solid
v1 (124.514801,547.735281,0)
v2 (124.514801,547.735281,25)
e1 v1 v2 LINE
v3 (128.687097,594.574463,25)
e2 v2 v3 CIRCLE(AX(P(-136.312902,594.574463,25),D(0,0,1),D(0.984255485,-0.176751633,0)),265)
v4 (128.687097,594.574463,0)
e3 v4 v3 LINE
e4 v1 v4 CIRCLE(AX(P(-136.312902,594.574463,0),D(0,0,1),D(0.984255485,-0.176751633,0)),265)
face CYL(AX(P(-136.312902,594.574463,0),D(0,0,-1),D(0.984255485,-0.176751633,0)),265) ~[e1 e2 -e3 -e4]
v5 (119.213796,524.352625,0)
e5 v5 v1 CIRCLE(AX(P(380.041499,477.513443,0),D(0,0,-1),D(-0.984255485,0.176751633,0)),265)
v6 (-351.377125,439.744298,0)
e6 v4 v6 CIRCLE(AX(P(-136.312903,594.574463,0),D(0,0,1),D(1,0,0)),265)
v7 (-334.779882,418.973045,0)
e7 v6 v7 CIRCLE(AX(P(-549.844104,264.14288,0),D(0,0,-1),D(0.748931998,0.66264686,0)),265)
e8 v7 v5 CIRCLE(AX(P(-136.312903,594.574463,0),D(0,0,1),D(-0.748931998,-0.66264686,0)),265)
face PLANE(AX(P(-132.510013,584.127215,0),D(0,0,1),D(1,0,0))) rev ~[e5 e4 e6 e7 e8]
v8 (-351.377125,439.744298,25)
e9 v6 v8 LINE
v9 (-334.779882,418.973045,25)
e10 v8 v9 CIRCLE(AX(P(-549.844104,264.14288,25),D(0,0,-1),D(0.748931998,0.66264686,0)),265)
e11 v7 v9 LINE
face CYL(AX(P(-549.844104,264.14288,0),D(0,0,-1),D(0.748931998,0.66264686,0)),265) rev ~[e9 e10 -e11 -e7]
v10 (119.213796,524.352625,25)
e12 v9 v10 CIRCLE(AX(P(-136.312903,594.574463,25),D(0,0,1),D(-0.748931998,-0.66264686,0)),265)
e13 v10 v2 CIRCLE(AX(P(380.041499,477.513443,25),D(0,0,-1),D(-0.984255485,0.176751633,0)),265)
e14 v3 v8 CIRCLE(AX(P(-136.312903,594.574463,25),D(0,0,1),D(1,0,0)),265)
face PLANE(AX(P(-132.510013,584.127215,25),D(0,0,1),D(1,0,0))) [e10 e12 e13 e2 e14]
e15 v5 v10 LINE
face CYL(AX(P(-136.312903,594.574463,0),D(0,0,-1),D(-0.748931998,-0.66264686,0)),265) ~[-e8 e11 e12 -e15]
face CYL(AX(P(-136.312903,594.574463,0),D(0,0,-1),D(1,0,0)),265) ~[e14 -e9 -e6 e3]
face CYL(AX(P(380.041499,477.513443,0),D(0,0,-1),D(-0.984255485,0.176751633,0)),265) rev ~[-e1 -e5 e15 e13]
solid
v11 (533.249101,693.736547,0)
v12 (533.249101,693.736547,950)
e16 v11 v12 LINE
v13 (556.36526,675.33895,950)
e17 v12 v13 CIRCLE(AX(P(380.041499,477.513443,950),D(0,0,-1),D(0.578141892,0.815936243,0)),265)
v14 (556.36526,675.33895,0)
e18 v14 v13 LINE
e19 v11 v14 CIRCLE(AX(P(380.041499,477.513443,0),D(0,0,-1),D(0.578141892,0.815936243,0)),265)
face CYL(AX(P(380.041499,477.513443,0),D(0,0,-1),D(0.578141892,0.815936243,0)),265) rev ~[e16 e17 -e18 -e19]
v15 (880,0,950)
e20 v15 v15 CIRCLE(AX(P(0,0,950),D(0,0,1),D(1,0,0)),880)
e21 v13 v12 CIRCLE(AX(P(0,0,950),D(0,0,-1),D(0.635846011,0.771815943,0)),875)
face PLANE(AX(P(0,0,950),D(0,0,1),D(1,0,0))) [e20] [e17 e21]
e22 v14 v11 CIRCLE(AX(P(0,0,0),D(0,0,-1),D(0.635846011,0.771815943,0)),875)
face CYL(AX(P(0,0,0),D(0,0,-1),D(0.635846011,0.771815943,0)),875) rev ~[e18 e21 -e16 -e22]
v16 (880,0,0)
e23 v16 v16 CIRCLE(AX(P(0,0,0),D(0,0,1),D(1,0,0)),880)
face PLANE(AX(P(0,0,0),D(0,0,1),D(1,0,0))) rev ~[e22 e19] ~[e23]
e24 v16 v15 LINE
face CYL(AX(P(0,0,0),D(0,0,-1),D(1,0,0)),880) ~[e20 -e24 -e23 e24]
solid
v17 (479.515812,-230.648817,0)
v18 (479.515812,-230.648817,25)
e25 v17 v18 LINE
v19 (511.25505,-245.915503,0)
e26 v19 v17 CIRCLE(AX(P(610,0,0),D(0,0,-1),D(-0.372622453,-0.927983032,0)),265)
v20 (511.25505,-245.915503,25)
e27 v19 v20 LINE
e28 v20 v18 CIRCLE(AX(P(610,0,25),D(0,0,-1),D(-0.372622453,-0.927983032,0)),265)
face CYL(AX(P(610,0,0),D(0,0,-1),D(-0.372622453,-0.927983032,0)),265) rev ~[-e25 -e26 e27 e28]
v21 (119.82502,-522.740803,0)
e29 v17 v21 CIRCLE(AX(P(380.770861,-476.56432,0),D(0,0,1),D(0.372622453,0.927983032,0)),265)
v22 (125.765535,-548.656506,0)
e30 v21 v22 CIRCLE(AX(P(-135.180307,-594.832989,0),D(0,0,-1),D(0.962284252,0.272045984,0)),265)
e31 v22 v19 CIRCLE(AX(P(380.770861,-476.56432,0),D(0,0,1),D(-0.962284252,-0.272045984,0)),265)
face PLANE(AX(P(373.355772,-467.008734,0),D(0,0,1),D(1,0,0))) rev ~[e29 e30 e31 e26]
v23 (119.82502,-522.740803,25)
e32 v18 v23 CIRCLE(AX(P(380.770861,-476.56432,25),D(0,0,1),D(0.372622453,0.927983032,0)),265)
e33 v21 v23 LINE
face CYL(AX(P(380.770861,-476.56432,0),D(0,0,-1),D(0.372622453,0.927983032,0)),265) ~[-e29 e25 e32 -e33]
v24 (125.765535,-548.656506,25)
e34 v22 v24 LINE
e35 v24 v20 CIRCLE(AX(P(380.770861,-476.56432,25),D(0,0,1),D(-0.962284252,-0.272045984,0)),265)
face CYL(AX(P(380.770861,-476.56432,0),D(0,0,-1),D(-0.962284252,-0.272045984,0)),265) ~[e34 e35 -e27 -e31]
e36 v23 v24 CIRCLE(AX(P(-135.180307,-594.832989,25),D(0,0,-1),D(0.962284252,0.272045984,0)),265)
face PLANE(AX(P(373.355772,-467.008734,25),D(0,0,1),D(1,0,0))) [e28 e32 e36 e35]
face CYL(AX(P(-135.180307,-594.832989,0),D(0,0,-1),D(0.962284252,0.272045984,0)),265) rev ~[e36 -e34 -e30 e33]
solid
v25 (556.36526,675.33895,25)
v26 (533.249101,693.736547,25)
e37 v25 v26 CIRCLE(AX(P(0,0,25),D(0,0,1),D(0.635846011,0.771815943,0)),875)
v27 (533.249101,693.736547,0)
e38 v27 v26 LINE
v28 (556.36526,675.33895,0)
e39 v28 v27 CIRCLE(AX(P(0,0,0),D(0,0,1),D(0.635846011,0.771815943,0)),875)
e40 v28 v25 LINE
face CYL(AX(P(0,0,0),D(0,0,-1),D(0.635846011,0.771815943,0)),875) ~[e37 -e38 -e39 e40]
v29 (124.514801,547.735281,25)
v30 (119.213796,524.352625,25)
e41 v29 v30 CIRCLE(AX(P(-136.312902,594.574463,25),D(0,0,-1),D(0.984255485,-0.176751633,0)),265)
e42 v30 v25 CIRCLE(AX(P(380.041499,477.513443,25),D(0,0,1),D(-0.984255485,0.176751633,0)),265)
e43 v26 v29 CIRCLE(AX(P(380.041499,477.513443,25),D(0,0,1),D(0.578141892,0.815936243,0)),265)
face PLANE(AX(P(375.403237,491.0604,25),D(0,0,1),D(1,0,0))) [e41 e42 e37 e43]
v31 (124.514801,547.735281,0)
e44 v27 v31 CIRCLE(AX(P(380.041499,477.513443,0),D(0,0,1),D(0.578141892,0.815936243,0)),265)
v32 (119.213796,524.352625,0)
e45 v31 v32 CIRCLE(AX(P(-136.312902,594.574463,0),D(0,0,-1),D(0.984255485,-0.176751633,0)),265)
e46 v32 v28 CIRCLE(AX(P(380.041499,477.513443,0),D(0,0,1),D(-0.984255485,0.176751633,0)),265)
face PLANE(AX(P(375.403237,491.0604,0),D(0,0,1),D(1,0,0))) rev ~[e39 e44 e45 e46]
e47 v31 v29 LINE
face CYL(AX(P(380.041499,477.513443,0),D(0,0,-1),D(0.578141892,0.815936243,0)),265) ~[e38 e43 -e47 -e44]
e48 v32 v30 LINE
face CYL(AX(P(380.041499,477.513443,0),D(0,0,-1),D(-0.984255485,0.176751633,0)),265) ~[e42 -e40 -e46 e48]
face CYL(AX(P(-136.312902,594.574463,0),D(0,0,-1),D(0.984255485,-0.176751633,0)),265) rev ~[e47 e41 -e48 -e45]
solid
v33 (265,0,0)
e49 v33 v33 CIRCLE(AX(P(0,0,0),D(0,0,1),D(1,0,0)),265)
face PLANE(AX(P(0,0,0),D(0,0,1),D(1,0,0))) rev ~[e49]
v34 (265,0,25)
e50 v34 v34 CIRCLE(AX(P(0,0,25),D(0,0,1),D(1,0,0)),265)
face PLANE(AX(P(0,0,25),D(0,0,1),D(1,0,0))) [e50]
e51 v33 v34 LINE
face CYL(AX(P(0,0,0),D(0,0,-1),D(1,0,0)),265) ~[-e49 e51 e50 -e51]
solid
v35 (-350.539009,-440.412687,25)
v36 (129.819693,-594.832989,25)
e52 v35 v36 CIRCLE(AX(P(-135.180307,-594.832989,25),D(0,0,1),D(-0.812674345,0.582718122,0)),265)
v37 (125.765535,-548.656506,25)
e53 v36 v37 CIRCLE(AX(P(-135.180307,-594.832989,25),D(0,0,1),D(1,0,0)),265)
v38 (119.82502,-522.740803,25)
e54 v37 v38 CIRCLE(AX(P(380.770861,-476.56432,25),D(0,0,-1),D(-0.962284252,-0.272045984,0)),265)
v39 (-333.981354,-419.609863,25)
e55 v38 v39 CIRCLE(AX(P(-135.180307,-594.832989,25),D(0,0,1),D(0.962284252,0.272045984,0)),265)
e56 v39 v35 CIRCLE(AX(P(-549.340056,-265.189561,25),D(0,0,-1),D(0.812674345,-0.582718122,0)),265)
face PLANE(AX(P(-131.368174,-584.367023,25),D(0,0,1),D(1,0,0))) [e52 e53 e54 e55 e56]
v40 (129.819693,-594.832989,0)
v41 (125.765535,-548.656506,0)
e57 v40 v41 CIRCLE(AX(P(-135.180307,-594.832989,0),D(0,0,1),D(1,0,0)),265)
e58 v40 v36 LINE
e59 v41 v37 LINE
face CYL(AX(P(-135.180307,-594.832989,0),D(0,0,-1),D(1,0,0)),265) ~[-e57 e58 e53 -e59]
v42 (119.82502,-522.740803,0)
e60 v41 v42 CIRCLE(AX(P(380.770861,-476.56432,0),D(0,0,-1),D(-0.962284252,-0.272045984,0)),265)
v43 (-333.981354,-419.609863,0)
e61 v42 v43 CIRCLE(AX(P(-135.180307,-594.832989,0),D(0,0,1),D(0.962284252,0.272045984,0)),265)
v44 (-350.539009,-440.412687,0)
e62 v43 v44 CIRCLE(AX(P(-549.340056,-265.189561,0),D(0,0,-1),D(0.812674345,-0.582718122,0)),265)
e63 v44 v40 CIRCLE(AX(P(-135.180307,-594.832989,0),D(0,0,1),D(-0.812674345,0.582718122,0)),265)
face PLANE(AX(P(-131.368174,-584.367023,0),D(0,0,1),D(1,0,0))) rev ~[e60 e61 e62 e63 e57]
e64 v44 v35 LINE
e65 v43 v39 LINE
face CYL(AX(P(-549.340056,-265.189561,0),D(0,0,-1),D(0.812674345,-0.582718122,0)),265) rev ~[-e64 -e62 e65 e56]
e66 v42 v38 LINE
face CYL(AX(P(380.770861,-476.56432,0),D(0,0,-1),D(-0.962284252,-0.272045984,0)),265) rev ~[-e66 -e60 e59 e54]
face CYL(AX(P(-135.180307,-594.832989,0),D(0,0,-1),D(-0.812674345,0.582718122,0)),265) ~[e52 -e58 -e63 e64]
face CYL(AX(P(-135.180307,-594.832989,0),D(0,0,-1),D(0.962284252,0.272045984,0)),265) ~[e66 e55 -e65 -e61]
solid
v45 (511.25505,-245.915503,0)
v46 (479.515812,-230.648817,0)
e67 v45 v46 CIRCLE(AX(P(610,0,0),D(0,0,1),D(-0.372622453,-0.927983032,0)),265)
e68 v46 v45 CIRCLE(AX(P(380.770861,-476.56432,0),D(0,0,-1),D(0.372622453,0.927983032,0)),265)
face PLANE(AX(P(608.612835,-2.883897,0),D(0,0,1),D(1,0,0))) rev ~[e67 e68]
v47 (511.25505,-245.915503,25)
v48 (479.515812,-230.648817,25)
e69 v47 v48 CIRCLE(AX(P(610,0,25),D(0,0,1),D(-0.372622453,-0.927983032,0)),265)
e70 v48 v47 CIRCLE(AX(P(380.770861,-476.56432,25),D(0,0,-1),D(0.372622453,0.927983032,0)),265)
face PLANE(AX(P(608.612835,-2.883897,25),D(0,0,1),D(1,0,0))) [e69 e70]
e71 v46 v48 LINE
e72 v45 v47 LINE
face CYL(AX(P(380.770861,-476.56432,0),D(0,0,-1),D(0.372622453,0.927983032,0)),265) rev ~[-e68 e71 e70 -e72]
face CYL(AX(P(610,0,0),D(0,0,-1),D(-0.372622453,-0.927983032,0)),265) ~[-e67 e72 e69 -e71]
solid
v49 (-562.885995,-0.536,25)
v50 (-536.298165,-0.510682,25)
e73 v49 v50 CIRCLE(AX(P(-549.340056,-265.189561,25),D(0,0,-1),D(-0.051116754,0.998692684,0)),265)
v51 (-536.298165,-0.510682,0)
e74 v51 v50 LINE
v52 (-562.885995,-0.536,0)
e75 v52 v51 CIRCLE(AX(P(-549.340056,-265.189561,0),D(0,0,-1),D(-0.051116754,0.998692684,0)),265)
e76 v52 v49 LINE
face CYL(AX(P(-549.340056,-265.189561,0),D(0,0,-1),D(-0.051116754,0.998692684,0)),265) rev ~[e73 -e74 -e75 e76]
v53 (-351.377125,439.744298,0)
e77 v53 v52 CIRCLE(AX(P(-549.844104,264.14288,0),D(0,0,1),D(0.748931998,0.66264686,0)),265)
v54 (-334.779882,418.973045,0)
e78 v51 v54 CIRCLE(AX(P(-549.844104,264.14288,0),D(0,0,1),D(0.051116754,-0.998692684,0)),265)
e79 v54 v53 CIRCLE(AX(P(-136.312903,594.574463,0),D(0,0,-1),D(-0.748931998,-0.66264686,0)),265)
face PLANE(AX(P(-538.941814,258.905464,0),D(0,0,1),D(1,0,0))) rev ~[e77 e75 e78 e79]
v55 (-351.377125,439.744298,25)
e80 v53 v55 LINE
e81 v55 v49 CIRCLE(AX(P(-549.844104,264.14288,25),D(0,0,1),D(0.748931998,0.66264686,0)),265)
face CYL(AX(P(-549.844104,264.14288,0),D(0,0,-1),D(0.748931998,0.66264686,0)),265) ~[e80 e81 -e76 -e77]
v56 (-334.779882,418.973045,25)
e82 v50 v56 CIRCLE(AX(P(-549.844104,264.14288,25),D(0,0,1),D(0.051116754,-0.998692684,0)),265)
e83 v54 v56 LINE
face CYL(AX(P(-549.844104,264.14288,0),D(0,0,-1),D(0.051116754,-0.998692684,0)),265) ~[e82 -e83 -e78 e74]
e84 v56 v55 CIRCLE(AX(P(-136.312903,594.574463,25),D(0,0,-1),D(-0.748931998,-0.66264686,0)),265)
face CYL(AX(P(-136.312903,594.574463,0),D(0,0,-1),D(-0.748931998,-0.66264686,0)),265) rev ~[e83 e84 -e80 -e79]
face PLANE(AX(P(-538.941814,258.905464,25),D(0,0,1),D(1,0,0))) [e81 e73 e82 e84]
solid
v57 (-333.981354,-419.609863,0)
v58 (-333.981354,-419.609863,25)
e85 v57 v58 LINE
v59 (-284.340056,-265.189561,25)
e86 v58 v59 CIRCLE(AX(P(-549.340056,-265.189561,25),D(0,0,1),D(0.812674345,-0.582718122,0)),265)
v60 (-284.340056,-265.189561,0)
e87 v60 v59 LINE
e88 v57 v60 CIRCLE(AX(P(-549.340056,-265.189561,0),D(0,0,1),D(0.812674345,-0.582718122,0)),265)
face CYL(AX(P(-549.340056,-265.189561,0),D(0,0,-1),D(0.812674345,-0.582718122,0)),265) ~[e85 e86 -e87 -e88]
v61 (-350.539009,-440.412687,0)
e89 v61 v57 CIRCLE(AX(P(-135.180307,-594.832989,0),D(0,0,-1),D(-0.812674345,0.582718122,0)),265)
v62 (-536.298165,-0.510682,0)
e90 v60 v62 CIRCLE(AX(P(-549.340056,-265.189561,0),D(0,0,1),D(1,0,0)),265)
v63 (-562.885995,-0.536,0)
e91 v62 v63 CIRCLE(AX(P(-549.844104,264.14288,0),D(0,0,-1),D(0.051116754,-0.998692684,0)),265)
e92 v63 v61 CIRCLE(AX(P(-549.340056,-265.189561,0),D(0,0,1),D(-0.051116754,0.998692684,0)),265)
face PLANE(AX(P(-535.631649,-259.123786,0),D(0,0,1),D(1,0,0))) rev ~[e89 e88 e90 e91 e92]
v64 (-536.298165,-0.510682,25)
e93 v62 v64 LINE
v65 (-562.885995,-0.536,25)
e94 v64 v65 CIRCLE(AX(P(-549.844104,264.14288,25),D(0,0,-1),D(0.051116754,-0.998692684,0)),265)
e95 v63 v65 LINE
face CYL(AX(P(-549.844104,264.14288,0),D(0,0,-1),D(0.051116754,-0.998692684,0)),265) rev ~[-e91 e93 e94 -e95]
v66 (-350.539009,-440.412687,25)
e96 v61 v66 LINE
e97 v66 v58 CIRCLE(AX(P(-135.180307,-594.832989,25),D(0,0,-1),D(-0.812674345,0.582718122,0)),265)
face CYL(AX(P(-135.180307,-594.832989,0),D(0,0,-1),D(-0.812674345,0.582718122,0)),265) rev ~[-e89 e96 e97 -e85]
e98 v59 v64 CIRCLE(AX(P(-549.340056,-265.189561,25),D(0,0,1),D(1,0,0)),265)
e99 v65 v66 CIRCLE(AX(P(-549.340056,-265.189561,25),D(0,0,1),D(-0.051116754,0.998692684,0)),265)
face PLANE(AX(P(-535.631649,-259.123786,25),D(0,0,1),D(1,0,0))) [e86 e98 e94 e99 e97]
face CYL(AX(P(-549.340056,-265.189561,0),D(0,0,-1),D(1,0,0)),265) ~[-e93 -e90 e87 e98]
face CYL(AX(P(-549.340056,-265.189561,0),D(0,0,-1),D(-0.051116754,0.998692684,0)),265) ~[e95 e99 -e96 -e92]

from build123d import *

# Parameters (mm, degrees)
F1_DEPTH = 25
F0_R     = 265
F0_R_2   = 880
F2_DEPTH = 950


with BuildPart() as f1:
    # F0 (on Top) → F1 (new body)
    with BuildSketch(Plane.XY):
        with BuildLine():
            ThreePointArc((-193.9061843773, -853.2440399207), (30.141564439, -801.9408802065), (129.8196926395, -594.8329887472))
            ThreePointArc((129.8196926395, -594.8329887472), (128.8042074457, -571.6559323656), (125.7655345828, -548.6565058525))
            ThreePointArc((125.7655345828, -548.6565058525), (122.470052193, -535.7732038744), (119.8250195137, -522.7408028614))
            ThreePointArc((119.8250195137, -522.7408028614), (-76.4544361301, -336.4219362587), (-333.9813542907, -419.6098631631))
            ThreePointArc((-333.9813542907, -419.6098631631), (-341.9991199047, -430.2190624071), (-350.5390087439, -440.4126865248))
            ThreePointArc((-350.5390087439, -440.4126865248), (-382.9463676187, -688.8381980929), (-193.9061843773, -853.2440399207))
        make_face()
    extrude(amount=F1_DEPTH)


with BuildPart() as f1b:
    # F0 (on Top) → F1, piece 2 (new body)
    with BuildSketch(Plane.XY):
        with BuildLine():
            ThreePointArc((119.8250195137, -522.7408028614), (123.1205019034, -535.6241048395), (125.7655345828, -548.6565058525))
            ThreePointArc((125.7655345828, -548.6565058525), (299.7849702857, -728.8861094166), (546.1877145957, -683.5963578199))
            ThreePointArc((546.1877145957, -683.5963578199), (619.5808969263, -591.4327967526), (645.7708614569, -476.5643199667))
            ThreePointArc((645.7708614569, -476.5643199667), (609.6849391517, -343.0602187819), (511.2550498858, -245.9155034294))
            ThreePointArc((511.2550498858, -245.9155034294), (495.1315212016, -238.8100345014), (479.5158115711, -230.6488165373))
            ThreePointArc((479.5158115711, -230.6488165373), (213.7178326121, -270.8502330554), (119.8250195137, -522.7408028614))
        make_face()
    extrude(amount=F1_DEPTH)


with BuildPart() as f1c:
    # F0 (on Top) → F1, piece 3 (new body)
    with BuildSketch(Plane.XY):
        with BuildLine():
            ThreePointArc((-787.9877787267, -380.3948745413), (-585.3605198344, -527.7300838352), (-350.5390087439, -440.4126865248))
            ThreePointArc((-350.5390087439, -440.4126865248), (-342.52124313, -429.8034872808), (-333.9813542907, -419.6098631631))
            ThreePointArc((-333.9813542907, -419.6098631631), (-297.0554387565, -346.2911766256), (-284.3400556741, -265.1895609407))
            ThreePointArc((-284.3400556741, -265.1895609407), (-357.4011316606, -82.4754414848), (-536.2981647198, -0.5106817676))
            ThreePointArc((-536.2981647198, -0.5106817676), (-549.5917623332, -0.8570003073), (-562.8859953912, -0.5359996249))
            ThreePointArc((-562.8859953912, -0.5359996249), (-777.3172521182, -130.0918263132), (-787.9877787267, -380.3948745413))
        make_face()
    extrude(amount=F1_DEPTH)


with BuildPart() as f1d:
    # F0 (on Top) → F1, piece 4 (new body)
    with BuildSketch(Plane.XY):
        with BuildLine():
            ThreePointArc((495.0207504098, 238.7567217141), (345.1444456193, 8.7484463585), (479.5158115711, -230.6488165373))
            ThreePointArc((479.5158115711, -230.6488165373), (495.6393402554, -237.7542854654), (511.2550498858, -245.9155034294))
            ThreePointArc((511.2550498858, -245.9155034294), (758.421002927, -219.5363429825), (875, 0))
            ThreePointArc((875, 0), (750.9884726823, 224.3819301341), (495.0207504098, 238.7567217141))
        make_face()
    extrude(amount=F1_DEPTH)


with BuildPart() as f1e:
    # F0 (on Top) → F1, piece 5 (new body)
    with BuildSketch(Plane.XY):
        with BuildLine():
            ThreePointArc((-788.7107999512, 378.8934864053), (-777.5635978963, 128.6112142499), (-562.8859953912, -0.5359996249))
            ThreePointArc((-562.8859953912, -0.5359996249), (-549.5923977778, -0.1896810852), (-536.2981647198, -0.5106817676))
            ThreePointArc((-536.2981647198, -0.5106817676), (-357.7312807823, 81.6116137676), (-284.8441044368, 264.1428795483))
            ThreePointArc((-284.8441044368, 264.1428795483), (-297.6368296433, 345.4846925427), (-334.7798821065, 418.9730454509))
            ThreePointArc((-334.7798821065, 418.9730454509), (-343.339168888, 429.1503871388), (-351.3771248405, 439.7442975662))
            ThreePointArc((-351.3771248405, 439.7442975662), (-586.3645037542, 526.6143264405), (-788.7107999512, 378.8934864053))
        make_face()
    extrude(amount=F1_DEPTH)


with BuildPart() as f1f:
    # F0 (on Top) → F1, piece 6 (new body)
    with BuildSketch(Plane.XY):
        with BuildLine():
            ThreePointArc((119.2137956135, 524.3526253699), (219.7006191662, 266.525760103), (495.0207504098, 238.7567217141))
            ThreePointArc((495.0207504098, 238.7567217141), (604.4234298179, 336.5249707271), (645.0414992079, 477.5134426521))
            ThreePointArc((645.0414992079, 477.5134426521), (621.8583685619, 585.9090223399), (556.365259994, 675.3389500627))
            ThreePointArc((556.365259994, 675.3389500627), (544.884833308, 684.6353178379), (533.2491005483, 693.7365470872))
            ThreePointArc((533.2491005483, 693.7365470872), (290.8989625906, 727.0702661722), (124.5148010842, 547.7352807511))
            ThreePointArc((124.5148010842, 547.7352807511), (122.1288785288, 535.9839709516), (119.2137956135, 524.3526253699))
        make_face()
    extrude(amount=F1_DEPTH)


with BuildPart() as f1g:
    # F0 (on Top) → F1, piece 7 (new body)
    with BuildSketch(Plane.XY):
        with BuildLine():
            ThreePointArc((-195.5307848239, 852.8732099123), (-384.2575390444, 688.1076512362), (-351.3771248405, 439.7442975662))
            ThreePointArc((-351.3771248405, 439.7442975662), (-342.817838059, 429.5669558783), (-334.7798821065, 418.9730454509))
            ThreePointArc((-334.7798821065, 418.9730454509), (-76.3949015791, 336.4372263944), (119.2137956135, 524.3526253699))
            ThreePointArc((119.2137956135, 524.3526253699), (121.599718169, 536.1039351694), (124.5148010842, 547.7352807511))
            ThreePointArc((124.5148010842, 547.7352807511), (127.6419624313, 571.062141726), (128.6870974898, 594.5744634688))
            ThreePointArc((128.6870974898, 594.5744634688), (28.8116886125, 801.8396786077), (-195.5307848239, 852.8732099123))
        make_face()
    extrude(amount=F1_DEPTH)


with BuildPart() as f1h:
    # F0 (on Top) → F1, piece 8 (new body)
    with BuildSketch(Plane.XY):
        Circle(F0_R)
    extrude(amount=F1_DEPTH)


with BuildPart() as f2:
    # F0 (on Top) → F2 (new body)
    with BuildSketch(Plane.XY):
        Circle(F0_R_2)
        with BuildLine():
            ThreePointArc((546.1877145957, -683.5963578199), (195.5010310556, -852.8800307524), (-193.9061843773, -853.2440399207))
            ThreePointArc((-193.9061843773, -853.2440399207), (-544.9087281325, -684.6162998388), (-787.9877787267, -380.3948745413))
            ThreePointArc((-787.9877787267, -380.3948745413), (-874.9996032962, -0.8332055607), (-788.7107999512, 378.8934864053))
            ThreePointArc((-788.7107999512, 378.8934864053), (-546.211560546, 683.5773044257), (-195.5307848239, 852.8732099123))
            ThreePointArc((-195.5307848239, 852.8732099123), (186.6669080413, 854.8569853738), (533.2491005483, 693.7365470872))
            ThreePointArc((533.2491005483, 693.7365470872), (545.0637630098, 684.8601389116), (556.365259994, 675.3389500627))
            ThreePointArc((556.365259994, 675.3389500627), (791.3420886364, 373.3667081471), (875, 0))
            ThreePointArc((875, 0), (788.5236997932, -379.2827110011), (546.1877145957, -683.5963578199))
        make_face(mode=Mode.SUBTRACT)
    extrude(amount=F2_DEPTH)


solid = Compound([f1.part, f1b.part, f1c.part, f1d.part, f1e.part, f1f.part, f1g.part, f1h.part, f2.part])
